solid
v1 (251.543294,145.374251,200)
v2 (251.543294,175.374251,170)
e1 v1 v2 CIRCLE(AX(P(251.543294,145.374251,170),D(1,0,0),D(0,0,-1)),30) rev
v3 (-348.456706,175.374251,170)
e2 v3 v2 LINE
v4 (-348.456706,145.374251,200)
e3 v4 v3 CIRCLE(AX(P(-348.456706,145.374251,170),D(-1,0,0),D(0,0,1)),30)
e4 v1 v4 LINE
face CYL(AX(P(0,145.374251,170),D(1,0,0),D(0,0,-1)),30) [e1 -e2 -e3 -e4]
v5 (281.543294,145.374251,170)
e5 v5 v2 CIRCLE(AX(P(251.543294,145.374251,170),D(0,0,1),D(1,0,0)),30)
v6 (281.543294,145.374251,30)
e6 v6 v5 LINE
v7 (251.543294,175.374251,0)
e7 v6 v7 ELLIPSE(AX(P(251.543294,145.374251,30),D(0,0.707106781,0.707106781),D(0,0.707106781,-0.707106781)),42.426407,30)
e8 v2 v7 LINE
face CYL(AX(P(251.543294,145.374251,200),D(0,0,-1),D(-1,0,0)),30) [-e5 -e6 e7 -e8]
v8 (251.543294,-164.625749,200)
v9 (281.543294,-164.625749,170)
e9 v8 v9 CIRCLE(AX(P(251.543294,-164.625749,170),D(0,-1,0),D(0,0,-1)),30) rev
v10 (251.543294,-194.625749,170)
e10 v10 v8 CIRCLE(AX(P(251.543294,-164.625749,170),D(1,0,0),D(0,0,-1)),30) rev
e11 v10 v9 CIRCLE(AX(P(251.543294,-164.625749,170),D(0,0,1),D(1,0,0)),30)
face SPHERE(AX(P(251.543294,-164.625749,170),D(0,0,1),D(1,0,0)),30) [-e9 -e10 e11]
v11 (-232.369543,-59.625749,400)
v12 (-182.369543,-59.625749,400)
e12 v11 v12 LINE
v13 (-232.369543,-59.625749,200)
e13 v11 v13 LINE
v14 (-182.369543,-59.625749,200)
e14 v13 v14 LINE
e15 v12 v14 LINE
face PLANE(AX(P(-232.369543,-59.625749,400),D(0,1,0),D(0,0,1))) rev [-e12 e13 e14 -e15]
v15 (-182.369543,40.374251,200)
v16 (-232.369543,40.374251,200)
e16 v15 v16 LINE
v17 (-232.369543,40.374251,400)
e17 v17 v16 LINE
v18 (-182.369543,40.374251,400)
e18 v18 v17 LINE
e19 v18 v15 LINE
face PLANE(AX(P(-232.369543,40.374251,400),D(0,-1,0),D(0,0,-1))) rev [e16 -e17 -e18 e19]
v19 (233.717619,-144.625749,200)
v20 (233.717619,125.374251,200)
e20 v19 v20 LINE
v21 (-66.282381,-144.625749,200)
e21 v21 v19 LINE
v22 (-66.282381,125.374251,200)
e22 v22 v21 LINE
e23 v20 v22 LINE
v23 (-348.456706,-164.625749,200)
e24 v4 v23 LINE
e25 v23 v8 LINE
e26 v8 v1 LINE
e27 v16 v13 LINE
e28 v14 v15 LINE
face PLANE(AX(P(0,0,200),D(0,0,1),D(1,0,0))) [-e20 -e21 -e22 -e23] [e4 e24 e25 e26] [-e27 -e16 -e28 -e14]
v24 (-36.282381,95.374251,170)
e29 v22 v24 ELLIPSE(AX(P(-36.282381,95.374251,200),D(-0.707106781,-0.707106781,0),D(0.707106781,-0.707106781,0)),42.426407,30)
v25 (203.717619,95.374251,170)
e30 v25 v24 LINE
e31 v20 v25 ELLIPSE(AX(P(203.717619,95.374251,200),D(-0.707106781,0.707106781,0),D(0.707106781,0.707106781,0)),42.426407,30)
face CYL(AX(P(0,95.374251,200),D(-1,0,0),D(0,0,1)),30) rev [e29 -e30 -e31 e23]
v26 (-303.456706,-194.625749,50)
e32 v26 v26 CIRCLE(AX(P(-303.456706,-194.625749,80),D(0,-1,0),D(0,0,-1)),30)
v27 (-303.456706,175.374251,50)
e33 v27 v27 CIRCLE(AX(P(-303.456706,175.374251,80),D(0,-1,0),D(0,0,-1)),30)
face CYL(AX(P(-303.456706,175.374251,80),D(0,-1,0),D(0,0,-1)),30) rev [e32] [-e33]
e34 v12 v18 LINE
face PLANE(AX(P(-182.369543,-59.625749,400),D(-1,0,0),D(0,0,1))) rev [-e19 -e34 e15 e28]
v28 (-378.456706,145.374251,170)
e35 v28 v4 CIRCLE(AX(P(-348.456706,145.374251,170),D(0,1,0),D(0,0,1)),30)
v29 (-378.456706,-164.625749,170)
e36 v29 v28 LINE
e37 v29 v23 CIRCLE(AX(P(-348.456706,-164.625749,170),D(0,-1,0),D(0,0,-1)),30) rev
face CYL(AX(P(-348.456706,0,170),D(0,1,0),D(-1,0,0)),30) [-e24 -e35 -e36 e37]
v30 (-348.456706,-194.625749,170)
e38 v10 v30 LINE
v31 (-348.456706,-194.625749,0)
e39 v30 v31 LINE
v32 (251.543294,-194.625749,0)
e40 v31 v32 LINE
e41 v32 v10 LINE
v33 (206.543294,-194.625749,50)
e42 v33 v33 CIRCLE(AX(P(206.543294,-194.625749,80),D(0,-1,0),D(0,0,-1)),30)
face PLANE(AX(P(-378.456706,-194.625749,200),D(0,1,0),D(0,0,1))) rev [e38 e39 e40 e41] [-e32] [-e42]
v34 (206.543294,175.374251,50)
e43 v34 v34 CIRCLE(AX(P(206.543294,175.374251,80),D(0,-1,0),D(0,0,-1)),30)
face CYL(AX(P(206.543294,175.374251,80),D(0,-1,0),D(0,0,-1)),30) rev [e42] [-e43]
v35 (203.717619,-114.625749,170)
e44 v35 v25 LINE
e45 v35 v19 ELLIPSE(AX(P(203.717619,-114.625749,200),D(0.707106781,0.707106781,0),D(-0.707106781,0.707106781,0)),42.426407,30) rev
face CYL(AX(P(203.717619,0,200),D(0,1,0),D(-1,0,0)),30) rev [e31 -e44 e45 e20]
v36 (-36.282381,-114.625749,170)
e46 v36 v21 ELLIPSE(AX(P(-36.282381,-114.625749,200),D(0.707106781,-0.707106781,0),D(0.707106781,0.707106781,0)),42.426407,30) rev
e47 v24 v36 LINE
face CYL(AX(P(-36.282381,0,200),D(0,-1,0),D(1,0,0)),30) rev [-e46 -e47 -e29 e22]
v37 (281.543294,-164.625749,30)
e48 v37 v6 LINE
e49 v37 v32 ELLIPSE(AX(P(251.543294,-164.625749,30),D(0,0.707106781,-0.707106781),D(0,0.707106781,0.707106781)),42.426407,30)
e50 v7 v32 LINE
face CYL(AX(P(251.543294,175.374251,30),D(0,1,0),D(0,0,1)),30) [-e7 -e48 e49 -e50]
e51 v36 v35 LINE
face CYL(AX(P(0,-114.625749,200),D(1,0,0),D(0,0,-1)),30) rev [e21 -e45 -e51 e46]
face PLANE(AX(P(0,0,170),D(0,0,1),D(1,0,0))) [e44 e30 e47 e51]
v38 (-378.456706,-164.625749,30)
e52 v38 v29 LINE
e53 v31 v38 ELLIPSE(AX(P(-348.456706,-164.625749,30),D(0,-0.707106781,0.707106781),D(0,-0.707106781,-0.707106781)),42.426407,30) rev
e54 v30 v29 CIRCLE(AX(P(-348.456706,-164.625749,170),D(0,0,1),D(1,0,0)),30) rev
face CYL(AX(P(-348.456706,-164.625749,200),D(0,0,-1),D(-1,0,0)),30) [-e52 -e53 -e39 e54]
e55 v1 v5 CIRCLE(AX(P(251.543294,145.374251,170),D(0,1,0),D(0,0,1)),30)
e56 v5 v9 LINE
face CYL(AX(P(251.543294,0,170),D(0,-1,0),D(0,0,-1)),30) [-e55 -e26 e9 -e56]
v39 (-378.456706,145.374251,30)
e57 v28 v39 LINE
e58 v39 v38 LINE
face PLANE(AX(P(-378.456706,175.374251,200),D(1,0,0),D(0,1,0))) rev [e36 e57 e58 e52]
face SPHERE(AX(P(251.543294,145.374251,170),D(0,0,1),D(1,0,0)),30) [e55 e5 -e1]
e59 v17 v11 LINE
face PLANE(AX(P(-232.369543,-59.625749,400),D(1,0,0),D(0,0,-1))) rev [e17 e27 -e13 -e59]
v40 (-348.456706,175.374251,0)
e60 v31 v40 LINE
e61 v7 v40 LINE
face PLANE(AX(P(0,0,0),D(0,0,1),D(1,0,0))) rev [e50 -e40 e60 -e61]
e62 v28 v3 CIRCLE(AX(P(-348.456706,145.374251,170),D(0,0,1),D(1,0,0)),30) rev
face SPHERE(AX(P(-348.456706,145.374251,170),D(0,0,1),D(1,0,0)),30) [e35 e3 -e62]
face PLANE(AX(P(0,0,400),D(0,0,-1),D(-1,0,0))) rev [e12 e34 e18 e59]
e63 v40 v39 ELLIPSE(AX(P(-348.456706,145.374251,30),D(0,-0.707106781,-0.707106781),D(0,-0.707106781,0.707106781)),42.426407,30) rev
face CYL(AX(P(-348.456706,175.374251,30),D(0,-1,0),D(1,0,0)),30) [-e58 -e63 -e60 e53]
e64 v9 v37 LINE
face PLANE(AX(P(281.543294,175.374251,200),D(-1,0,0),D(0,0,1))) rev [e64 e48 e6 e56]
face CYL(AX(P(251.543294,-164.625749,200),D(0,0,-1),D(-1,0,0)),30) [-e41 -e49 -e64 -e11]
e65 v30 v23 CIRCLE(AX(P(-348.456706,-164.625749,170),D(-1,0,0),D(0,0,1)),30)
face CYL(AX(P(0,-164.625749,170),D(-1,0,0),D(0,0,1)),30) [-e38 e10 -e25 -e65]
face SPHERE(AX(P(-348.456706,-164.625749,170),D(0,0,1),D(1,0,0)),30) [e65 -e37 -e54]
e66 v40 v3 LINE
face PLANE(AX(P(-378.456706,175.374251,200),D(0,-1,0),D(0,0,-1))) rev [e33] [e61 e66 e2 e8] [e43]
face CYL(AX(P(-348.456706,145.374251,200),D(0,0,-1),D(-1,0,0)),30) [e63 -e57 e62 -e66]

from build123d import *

# Parameters (mm, degrees)
SKIZZE1_W                       = 660
SKIZZE1_H                       = 370
AUFSATZ_LINEAR_AUSTRAGEN1_DEPTH = 200
SKIZZE2_R                       = 30
SCHNITT_LINEAR_AUSTRAGEN1_DEPTH = 566.799856976
VERRUNDUNG1_R                   = 30
SKIZZE3_W                       = 300
SKIZZE3_H                       = 270
SCHNITT_LINEAR_AUSTRAGEN2_DEPTH = 30
VERRUNDUNG2_R                   = 30
SKIZZE5_W                       = 50
SKIZZE5_H                       = 100
AUFSATZ_LINEAR_AUSTRAGEN2_DEPTH = 200


with BuildPart() as part:
    # Skizze1 → Aufsatz-Linear austragen1 (new body)
    with BuildSketch(Plane.XY):
        with Locations((-48.456705786, -9.625748503)):
            Rectangle(SKIZZE1_W, SKIZZE1_H)
    extrude(amount=AUFSATZ_LINEAR_AUSTRAGEN1_DEPTH)

    # Skizze2 → Schnitt-Linear austragen1 (cut, through all)
    with BuildSketch(Plane.XZ.offset(194.625748503)):
        with Locations(Location((-303.456705786, 80, 0), (0, 0, 270))):
            Circle(SKIZZE2_R)
        with Locations(Location((206.543294214, 80, 0), (0, 0, 270))):
            Circle(SKIZZE2_R)
    extrude(amount=-SCHNITT_LINEAR_AUSTRAGEN1_DEPTH, mode=Mode.SUBTRACT)

    # Verrundung1
    verrundung1_edges = [part.edges().sort_by_distance(p)[0] for p in [
        (281.543294214, -9.625748503, 200),
        (-48.456705786, 175.374251497, 200),
        (-378.456705786, -9.625748503, 200),
        (281.543294214, -9.625748503, 0),
        (-378.456705786, -9.625748503, 0),
        (-378.456705786, 175.374251497, 100),
        (281.543294214, 175.374251497, 100),
        (281.543294214, -194.625748503, 100),
        (-378.456705786, -194.625748503, 100),
        (-48.456705786, -194.625748503, 200),
    ]]
    fillet(verrundung1_edges, radius=VERRUNDUNG1_R)

    # Skizze3 → Schnitt-Linear austragen2 (cut)
    with BuildSketch(Plane.XY.offset(200)):
        with Locations((83.717618878, -9.625748503)):
            Rectangle(SKIZZE3_W, SKIZZE3_H)
    extrude(amount=-SCHNITT_LINEAR_AUSTRAGEN2_DEPTH, mode=Mode.SUBTRACT)

    # Verrundung2
    verrundung2_edges = [part.edges().sort_by_distance(p)[0] for p in [
        (233.717618878, -9.625748503, 170),
        (83.717618878, -144.625748503, 170),
        (-66.282381122, -9.625748503, 170),
        (83.717618878, 125.374251497, 170),
    ]]
    fillet(verrundung2_edges, radius=VERRUNDUNG2_R - 0.0001)  # a hair under: the kernel refuses the full size

    # Skizze5 → Aufsatz-Linear austragen2 (add)
    with BuildSketch(Plane.XY.offset(200)):
        with Locations((-207.369543454, -9.625748503)):
            Rectangle(SKIZZE5_W, SKIZZE5_H)
    extrude(amount=AUFSATZ_LINEAR_AUSTRAGEN2_DEPTH)


solid = part.part
